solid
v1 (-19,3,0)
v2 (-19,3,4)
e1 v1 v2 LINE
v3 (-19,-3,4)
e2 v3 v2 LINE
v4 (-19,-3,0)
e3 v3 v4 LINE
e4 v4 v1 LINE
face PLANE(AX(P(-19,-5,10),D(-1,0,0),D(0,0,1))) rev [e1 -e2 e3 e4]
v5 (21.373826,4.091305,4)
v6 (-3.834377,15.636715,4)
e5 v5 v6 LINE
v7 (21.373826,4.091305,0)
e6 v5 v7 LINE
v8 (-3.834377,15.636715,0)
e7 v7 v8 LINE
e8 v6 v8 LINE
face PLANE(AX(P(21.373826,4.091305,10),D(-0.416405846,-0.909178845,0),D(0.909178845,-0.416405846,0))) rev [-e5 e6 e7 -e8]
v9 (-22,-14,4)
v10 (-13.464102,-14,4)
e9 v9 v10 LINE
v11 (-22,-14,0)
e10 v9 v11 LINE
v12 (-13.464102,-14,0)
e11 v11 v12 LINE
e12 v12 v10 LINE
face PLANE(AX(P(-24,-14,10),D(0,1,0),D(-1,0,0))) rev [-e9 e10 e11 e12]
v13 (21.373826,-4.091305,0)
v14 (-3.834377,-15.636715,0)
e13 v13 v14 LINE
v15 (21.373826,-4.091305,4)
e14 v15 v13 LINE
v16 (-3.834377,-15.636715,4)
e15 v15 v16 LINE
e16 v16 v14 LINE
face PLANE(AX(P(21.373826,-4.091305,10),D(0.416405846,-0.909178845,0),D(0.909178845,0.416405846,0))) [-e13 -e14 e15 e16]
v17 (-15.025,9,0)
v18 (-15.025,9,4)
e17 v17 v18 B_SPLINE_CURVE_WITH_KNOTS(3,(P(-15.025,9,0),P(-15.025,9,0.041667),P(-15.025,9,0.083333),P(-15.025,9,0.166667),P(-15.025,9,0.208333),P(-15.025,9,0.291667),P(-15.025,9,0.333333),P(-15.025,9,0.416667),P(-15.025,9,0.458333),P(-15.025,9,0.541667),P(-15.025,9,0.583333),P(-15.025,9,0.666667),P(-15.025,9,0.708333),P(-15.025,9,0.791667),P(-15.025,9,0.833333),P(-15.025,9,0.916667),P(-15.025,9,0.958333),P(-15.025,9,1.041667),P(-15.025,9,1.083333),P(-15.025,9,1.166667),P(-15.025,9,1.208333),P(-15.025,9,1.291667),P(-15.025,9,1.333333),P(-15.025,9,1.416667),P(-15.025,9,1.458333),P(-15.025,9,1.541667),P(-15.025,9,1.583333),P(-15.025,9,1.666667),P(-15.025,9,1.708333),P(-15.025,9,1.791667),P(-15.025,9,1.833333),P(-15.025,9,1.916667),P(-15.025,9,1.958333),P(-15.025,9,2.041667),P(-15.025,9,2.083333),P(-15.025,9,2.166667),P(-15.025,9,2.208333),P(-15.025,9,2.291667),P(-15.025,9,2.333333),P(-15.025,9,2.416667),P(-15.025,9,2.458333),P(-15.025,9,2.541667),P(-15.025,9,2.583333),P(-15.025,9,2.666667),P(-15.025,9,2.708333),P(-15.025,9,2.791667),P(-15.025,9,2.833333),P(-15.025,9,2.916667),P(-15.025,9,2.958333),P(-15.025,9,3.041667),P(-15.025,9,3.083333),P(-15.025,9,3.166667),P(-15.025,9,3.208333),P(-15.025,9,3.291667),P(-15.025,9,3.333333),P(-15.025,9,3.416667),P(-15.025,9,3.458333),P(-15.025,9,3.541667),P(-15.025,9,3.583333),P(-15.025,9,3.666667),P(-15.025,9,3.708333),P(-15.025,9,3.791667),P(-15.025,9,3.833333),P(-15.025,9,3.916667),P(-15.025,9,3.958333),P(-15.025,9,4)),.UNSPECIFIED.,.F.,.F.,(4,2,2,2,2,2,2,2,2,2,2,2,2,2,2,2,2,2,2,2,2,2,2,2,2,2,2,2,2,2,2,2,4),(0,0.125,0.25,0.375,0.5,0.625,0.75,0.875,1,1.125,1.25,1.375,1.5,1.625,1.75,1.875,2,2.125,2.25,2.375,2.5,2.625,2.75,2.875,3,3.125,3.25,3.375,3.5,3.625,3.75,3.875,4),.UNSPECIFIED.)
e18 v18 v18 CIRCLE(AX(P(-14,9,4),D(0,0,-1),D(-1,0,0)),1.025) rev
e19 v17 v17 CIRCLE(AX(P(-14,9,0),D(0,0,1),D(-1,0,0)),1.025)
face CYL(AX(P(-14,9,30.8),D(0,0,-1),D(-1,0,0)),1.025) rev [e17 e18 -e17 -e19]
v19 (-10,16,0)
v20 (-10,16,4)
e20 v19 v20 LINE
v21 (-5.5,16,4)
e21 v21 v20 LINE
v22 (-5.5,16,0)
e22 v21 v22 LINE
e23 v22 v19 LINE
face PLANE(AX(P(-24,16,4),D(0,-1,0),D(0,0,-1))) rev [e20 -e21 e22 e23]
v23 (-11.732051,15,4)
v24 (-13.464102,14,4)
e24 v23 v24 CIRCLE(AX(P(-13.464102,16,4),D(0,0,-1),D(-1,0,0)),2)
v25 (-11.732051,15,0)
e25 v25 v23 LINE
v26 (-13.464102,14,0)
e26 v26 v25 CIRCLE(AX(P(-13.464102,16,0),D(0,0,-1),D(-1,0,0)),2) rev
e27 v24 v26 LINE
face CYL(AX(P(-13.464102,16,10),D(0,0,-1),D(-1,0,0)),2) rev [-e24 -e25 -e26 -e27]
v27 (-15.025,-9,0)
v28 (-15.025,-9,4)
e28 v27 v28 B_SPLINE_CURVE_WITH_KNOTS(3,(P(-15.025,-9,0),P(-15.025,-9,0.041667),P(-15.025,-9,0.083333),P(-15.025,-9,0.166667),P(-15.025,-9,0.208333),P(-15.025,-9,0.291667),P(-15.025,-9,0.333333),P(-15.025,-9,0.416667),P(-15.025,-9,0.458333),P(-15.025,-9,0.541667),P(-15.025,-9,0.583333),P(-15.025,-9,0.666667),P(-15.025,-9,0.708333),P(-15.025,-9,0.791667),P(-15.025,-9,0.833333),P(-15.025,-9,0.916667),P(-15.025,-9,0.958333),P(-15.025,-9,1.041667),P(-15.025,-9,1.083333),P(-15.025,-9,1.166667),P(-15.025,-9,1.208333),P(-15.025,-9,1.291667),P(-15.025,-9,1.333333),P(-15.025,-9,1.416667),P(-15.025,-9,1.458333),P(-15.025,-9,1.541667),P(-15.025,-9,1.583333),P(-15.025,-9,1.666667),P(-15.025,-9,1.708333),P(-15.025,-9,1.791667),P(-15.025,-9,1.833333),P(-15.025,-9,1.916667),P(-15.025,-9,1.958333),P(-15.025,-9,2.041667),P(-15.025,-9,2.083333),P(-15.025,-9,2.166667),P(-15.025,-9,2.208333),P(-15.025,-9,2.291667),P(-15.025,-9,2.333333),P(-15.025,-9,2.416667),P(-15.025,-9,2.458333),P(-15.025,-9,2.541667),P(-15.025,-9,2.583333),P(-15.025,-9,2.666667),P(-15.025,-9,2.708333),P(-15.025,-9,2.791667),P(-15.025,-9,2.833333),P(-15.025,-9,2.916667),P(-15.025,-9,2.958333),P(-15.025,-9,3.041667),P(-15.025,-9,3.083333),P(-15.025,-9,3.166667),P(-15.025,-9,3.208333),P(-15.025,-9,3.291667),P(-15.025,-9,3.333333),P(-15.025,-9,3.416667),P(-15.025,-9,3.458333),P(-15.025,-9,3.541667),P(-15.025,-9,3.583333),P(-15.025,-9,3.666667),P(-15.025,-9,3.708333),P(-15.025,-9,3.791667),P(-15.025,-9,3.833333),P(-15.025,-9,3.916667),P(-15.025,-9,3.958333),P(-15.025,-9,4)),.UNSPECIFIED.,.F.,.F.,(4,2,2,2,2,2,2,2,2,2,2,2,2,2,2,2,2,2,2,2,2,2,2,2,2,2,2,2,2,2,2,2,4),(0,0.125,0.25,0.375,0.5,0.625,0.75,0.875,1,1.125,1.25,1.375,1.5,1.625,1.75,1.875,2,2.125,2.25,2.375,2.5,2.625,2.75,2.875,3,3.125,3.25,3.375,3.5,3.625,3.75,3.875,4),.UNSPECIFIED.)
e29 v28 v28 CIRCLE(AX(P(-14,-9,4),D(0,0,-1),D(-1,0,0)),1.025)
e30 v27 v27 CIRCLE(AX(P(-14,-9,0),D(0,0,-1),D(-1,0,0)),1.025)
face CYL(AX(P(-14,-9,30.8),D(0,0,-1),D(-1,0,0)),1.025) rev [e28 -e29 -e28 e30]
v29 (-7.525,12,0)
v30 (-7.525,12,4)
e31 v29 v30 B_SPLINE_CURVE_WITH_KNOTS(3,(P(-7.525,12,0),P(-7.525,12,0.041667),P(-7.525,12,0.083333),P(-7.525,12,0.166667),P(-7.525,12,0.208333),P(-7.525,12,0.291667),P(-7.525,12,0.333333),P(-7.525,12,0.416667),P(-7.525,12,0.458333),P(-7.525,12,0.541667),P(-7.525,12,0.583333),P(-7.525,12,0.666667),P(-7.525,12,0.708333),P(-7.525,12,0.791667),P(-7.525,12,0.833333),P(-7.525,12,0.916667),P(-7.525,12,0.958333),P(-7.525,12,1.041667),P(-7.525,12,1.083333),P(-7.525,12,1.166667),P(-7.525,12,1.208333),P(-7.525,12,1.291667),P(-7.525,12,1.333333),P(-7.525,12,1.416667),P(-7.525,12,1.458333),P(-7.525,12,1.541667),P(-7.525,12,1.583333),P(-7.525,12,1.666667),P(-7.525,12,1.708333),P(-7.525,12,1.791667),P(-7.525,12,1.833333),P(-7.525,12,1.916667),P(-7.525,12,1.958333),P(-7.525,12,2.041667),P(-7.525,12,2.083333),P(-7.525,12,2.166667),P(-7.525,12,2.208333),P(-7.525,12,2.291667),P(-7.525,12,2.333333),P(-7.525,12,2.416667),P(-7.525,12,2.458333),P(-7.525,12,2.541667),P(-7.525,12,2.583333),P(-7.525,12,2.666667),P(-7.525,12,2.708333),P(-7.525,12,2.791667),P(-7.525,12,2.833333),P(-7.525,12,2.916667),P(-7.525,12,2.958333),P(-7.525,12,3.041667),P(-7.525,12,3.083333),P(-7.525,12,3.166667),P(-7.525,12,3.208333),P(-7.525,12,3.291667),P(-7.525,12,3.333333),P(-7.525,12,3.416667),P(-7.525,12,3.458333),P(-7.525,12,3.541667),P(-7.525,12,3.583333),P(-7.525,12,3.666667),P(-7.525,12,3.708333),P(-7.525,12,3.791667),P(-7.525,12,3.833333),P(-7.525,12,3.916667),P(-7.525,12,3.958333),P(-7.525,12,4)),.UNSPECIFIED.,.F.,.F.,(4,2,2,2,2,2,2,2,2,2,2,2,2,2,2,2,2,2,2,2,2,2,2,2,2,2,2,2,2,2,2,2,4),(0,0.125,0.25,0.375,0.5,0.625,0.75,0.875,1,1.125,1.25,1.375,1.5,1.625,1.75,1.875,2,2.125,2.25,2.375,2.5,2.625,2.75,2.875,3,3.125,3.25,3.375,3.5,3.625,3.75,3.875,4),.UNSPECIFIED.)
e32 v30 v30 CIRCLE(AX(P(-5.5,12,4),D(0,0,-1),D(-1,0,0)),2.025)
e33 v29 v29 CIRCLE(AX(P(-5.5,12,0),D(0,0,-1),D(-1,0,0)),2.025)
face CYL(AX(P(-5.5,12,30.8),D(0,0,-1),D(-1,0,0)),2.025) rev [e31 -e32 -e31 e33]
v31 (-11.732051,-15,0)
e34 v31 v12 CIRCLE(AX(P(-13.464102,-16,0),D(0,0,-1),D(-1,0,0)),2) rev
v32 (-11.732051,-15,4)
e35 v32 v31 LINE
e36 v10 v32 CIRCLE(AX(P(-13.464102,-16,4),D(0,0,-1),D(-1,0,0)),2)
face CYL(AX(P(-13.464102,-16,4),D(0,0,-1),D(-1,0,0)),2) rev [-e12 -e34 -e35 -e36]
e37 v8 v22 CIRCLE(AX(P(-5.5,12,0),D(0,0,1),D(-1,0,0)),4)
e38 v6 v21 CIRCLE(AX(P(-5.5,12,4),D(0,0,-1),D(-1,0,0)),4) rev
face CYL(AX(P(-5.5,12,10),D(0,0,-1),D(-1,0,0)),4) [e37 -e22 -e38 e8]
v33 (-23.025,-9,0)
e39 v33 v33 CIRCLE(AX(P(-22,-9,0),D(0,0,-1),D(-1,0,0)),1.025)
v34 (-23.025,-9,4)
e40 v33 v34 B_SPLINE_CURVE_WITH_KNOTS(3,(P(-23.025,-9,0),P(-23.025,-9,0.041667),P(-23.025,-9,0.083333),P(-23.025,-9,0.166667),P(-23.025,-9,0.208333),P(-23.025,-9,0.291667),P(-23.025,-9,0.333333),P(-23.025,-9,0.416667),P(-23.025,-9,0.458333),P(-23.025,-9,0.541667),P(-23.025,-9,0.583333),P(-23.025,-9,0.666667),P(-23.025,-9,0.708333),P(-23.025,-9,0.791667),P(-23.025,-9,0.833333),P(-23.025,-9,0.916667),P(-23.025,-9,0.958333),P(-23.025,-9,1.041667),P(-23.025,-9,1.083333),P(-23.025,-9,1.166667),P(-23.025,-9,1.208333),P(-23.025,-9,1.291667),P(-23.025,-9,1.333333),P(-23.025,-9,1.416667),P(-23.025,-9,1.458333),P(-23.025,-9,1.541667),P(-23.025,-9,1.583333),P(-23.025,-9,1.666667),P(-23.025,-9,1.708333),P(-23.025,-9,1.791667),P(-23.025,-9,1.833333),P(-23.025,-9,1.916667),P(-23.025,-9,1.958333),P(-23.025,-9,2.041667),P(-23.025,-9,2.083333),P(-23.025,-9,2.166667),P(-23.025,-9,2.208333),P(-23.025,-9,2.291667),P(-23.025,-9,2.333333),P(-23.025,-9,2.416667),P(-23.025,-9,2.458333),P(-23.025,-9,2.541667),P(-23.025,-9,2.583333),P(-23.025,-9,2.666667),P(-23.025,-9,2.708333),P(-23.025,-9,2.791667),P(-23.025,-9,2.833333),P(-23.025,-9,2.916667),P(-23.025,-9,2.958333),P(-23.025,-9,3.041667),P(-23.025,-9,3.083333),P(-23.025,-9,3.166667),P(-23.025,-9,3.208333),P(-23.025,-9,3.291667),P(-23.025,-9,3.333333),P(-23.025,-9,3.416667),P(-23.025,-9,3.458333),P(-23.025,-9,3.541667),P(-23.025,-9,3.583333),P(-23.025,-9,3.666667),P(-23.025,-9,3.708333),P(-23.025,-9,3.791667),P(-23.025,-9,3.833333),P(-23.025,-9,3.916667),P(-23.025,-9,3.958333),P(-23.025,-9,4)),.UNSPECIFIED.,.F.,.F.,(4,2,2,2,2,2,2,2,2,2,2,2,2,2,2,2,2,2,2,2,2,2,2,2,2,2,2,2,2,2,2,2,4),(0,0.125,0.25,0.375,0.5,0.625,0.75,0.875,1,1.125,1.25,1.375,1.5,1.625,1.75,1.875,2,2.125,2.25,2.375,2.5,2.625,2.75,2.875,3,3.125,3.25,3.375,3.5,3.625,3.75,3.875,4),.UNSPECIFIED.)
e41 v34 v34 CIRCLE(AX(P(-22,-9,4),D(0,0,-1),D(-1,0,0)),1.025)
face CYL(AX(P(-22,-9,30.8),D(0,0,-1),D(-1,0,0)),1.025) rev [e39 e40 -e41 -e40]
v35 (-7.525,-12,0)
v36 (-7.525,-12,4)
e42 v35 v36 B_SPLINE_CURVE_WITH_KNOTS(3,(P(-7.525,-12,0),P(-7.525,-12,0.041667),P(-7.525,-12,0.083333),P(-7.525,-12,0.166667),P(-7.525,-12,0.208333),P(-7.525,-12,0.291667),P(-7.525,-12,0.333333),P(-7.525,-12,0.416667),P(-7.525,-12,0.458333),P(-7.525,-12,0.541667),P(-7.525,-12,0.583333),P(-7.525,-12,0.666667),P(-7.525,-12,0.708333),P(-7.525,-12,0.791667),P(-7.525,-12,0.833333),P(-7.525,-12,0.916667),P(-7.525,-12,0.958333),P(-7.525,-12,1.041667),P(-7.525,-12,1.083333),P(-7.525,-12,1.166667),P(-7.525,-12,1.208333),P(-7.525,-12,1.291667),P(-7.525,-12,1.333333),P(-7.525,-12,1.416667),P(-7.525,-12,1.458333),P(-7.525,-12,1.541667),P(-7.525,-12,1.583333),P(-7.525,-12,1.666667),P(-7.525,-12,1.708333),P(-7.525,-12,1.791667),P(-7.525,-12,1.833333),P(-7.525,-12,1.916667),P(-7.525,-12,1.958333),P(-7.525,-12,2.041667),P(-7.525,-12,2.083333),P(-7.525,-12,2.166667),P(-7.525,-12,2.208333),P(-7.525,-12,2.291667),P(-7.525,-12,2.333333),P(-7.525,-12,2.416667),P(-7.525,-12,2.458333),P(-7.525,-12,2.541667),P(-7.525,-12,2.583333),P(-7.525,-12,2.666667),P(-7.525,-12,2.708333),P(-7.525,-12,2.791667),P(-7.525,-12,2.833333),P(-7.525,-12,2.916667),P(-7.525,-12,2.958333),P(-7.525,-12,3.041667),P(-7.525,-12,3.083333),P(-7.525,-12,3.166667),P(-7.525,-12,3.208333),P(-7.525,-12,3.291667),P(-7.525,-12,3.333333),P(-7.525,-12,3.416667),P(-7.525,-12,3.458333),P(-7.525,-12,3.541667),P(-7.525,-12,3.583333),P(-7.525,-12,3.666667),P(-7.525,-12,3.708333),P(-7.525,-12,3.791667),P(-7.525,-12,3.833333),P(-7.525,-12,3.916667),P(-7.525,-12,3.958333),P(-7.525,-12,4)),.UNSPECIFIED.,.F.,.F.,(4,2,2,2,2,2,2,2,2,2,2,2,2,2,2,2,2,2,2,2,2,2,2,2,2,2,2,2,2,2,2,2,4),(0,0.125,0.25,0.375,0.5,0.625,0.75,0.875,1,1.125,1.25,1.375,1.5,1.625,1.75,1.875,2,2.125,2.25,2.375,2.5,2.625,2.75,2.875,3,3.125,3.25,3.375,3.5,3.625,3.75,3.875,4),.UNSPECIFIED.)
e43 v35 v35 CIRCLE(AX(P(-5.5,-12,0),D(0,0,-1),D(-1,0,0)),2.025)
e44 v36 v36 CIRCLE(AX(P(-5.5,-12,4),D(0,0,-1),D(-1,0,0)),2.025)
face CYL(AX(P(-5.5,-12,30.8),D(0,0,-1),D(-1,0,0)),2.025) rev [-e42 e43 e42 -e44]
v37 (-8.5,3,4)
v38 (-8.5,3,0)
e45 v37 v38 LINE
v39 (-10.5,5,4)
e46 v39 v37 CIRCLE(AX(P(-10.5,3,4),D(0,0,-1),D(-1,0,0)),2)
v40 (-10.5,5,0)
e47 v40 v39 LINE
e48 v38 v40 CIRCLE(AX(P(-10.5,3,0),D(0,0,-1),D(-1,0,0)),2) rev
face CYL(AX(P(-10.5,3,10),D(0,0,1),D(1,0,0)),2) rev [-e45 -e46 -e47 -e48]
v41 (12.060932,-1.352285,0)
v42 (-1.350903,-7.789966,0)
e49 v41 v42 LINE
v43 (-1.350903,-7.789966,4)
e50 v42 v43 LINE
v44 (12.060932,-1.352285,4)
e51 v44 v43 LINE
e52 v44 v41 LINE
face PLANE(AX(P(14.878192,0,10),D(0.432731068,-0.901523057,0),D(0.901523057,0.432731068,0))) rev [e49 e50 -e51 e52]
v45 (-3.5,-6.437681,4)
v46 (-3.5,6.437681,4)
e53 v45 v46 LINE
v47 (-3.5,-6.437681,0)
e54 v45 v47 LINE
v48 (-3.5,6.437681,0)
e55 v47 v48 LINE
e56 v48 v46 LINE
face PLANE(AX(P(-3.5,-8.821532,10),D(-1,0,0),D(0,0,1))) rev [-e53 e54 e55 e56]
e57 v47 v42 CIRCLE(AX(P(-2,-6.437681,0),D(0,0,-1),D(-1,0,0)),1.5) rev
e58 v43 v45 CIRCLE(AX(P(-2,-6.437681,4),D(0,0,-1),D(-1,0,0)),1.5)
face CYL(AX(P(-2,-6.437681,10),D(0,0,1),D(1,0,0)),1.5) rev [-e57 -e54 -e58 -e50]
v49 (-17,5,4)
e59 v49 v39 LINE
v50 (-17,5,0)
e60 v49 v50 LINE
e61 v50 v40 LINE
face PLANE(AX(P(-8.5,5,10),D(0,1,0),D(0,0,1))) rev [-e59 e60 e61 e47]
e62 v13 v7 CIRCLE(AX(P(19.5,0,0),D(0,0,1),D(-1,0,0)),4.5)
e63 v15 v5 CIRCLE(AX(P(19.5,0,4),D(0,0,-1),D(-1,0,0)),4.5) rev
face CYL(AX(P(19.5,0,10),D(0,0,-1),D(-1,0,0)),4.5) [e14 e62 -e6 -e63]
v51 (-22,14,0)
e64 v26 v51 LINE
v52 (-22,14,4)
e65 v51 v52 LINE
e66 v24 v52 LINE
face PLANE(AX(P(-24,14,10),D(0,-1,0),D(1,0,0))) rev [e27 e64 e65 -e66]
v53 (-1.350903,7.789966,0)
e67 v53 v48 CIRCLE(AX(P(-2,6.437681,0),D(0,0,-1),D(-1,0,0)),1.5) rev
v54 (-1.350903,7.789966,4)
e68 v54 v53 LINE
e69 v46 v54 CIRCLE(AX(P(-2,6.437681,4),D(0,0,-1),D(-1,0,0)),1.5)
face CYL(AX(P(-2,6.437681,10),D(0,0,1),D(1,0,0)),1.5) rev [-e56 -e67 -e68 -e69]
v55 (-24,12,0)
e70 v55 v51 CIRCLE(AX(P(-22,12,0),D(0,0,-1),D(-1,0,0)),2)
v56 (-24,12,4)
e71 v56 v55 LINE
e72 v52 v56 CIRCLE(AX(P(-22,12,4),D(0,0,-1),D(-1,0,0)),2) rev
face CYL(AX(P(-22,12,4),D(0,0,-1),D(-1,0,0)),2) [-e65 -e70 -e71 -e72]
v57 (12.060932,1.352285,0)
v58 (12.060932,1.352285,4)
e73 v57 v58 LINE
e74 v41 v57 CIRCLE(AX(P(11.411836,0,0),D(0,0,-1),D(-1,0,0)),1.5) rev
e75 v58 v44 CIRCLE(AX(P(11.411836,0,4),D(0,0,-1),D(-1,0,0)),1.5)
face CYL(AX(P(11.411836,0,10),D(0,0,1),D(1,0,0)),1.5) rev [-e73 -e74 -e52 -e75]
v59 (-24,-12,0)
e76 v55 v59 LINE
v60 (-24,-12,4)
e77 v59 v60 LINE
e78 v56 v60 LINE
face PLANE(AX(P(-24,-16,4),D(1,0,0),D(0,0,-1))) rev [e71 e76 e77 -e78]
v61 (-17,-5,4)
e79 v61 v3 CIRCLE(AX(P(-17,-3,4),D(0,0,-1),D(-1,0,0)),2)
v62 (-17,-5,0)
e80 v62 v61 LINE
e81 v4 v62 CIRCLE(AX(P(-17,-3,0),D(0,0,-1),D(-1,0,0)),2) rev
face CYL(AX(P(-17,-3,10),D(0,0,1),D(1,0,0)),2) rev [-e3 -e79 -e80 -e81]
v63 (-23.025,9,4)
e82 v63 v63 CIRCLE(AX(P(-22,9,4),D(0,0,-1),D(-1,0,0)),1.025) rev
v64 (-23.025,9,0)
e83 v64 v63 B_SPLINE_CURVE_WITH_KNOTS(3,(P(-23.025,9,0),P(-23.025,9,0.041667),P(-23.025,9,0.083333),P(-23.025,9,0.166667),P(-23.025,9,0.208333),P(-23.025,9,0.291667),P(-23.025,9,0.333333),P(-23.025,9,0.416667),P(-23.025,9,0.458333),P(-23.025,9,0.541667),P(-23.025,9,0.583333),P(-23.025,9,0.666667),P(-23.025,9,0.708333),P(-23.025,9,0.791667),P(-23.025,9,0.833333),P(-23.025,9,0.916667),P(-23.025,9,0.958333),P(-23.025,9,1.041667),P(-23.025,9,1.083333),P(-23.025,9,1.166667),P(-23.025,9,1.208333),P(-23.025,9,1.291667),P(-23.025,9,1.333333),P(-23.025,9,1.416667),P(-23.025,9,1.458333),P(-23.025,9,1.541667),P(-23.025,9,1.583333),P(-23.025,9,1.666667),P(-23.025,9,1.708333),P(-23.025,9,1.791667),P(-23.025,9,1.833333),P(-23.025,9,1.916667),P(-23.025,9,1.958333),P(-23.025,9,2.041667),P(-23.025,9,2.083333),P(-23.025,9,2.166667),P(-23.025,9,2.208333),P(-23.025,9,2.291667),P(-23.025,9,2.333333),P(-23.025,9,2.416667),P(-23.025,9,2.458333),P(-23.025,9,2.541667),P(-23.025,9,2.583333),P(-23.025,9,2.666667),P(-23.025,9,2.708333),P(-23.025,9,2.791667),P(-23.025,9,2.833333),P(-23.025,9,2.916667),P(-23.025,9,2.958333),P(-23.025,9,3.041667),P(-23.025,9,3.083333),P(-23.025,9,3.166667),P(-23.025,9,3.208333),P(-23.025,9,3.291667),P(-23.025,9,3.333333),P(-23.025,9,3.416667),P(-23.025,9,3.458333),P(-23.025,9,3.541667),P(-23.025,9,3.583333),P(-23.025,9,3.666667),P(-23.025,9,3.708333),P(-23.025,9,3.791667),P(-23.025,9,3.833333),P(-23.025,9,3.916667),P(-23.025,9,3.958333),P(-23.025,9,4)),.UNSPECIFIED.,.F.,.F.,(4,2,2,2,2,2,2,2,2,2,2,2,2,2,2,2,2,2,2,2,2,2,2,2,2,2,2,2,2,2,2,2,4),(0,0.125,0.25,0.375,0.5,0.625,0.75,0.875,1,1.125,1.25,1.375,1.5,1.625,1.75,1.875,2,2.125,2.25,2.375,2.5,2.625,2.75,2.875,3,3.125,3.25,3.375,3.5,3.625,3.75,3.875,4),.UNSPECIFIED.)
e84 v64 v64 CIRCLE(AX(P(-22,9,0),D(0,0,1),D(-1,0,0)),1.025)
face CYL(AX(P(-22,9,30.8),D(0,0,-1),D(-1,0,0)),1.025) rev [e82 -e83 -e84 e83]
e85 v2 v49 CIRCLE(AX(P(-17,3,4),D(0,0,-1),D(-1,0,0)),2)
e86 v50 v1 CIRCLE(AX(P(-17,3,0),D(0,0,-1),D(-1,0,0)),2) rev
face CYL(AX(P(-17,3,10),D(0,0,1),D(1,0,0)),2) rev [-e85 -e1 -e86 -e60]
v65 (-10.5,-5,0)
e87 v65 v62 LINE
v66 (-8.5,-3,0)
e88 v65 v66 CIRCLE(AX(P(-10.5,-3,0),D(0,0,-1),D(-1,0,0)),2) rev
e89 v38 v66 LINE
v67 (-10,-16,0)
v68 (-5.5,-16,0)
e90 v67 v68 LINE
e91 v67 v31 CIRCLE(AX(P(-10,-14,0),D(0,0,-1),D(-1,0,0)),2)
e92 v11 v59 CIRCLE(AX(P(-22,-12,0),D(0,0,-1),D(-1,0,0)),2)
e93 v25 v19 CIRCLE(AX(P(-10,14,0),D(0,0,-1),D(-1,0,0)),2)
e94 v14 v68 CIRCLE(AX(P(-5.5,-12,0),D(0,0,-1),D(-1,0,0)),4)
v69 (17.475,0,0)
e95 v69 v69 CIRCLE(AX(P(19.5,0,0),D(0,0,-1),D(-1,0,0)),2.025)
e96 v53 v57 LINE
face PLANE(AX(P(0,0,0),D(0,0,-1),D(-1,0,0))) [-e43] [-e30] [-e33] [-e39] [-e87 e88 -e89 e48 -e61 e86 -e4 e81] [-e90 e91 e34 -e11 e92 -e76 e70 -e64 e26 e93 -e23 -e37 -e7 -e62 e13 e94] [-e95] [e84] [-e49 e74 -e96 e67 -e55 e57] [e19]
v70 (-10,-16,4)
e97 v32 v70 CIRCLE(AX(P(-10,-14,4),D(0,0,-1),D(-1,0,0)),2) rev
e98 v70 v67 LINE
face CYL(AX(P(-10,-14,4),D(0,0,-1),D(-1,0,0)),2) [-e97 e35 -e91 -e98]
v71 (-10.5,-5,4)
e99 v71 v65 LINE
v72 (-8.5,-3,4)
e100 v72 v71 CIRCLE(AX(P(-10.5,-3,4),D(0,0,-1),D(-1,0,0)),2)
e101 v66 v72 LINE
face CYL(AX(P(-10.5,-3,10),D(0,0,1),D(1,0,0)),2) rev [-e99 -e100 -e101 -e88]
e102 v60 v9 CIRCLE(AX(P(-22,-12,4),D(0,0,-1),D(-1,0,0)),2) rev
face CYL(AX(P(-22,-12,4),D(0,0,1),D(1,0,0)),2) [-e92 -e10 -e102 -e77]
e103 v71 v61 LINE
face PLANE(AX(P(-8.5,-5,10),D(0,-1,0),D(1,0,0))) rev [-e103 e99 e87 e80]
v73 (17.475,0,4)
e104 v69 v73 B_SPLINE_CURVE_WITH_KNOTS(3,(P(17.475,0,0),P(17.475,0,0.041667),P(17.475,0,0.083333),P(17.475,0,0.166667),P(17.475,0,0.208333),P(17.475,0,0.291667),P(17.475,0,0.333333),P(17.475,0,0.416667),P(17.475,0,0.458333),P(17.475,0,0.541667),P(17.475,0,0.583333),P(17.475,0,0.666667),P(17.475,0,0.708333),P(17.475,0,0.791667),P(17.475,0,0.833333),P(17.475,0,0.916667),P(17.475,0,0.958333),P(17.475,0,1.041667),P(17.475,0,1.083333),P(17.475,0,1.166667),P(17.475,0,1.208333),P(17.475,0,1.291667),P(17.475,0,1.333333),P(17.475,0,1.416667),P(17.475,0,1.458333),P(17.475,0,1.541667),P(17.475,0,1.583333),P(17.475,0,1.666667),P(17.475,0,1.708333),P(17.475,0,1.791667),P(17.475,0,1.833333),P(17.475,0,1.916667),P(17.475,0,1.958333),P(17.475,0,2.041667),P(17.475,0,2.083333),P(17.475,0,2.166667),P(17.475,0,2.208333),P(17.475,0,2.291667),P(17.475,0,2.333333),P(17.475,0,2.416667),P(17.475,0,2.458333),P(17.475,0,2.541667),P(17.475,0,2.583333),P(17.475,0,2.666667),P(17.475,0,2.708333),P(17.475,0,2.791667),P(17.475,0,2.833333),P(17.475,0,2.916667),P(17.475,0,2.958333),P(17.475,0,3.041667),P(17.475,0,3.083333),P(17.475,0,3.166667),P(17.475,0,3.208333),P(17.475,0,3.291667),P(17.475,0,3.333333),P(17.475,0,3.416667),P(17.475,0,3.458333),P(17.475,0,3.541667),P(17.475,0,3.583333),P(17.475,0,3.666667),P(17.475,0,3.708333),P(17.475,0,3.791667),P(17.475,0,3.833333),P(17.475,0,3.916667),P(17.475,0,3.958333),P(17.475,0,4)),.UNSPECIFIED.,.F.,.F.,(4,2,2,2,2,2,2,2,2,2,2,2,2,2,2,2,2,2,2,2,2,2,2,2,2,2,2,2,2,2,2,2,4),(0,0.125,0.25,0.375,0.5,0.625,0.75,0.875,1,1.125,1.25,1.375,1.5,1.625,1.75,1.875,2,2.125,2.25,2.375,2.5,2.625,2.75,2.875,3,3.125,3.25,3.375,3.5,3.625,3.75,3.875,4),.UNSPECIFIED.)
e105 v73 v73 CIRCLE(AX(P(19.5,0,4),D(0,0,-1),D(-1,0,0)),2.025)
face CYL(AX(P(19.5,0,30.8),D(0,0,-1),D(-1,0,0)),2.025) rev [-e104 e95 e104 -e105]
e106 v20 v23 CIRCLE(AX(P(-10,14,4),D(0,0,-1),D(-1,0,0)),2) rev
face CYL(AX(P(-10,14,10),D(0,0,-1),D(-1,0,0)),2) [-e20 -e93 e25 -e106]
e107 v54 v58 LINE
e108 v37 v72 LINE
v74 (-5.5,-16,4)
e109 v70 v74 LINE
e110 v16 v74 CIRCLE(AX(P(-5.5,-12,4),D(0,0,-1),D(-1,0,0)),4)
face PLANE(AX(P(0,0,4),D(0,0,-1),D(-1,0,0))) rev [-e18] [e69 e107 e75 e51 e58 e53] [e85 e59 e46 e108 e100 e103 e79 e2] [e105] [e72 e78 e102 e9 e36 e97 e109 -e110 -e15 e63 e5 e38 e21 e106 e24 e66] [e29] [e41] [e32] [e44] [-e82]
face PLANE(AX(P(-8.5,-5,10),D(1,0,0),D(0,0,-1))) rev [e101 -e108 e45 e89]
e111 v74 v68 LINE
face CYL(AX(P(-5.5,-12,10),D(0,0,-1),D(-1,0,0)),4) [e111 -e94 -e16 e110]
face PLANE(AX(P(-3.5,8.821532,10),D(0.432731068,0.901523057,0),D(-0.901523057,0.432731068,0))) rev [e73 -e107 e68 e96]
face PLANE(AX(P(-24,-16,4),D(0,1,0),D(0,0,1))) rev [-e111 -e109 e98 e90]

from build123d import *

# Parameters (mm, degrees)
SKETCH_1_W          = 48
SKETCH_1_H          = 32
EXTRUDE_1_DEPTH     = 4
SKETCH_2_R          = 2.025
SKETCH_2_R_2        = 1.025
CUT_EXTRUDE_1_DEPTH = 30.8
CUT_EXTRUDE_2_DEPTH = 10
SKETCH_5_W          = 12
SKETCH_5_H          = 2
CUT_EXTRUDE_3_DEPTH = 10
FILLET_1_R          = 2
CUT_EXTRUDE_4_DEPTH = 10
FILLET_2_R          = 1.5
SKETCH_7_W          = 10.5
SKETCH_7_H          = 10
CUT_EXTRUDE_5_DEPTH = 10
FILLET_3_R          = 2


with BuildPart() as part:
    # 草图1 → 凸台-拉伸1 (new body)
    with BuildSketch(Plane.XY):
        Rectangle(SKETCH_1_W, SKETCH_1_H)
    extrude(amount=EXTRUDE_1_DEPTH)

    # 草图2 → 切除-拉伸1 (cut)
    with BuildSketch(Plane(origin=(0, 0, 0), x_dir=(-1, 0, 0), z_dir=(0, 0, -1))):
        with Locations((-19.5, 0)):
            Circle(SKETCH_2_R)
        with Locations((5.5, -12)):
            Circle(SKETCH_2_R)
        with Locations((5.5, 12)):
            Circle(SKETCH_2_R)
        with Locations((14, -9)):
            Circle(SKETCH_2_R_2)
        with Locations((22, -9)):
            Circle(SKETCH_2_R_2)
    cut_extrude_1 = extrude(amount=-CUT_EXTRUDE_1_DEPTH, mode=Mode.SUBTRACT)

    # 草图4 → 切除-拉伸2 (cut)
    with BuildSketch(Plane(origin=(0, 0, 0), x_dir=(-1, 0, 0), z_dir=(0, 0, -1))):
        with BuildLine():
            Line((-21.373826305, 4.091304802), (3.834376618, 15.636715379))
            ThreePointArc((3.834376618, 15.636715379), (4.647609689, 15.908123688), (5.5, 16))
            Line((5.5, 16), (-24, 16))
            Line((-24, 16), (-24, 0))
            ThreePointArc((-24, 0), (-23.286965696, 2.430821017), (-21.373826305, 4.091304802))
        make_face()
    cut_extrude_2 = extrude(amount=-CUT_EXTRUDE_2_DEPTH, mode=Mode.SUBTRACT)

    # 镜向1: 切除-拉伸2 across plane
    add(cut_extrude_2.mirror(Plane.ZX), mode=Mode.SUBTRACT)

    # 草图5 → 切除-拉伸3 (cut)
    with BuildSketch(Plane(origin=(0, 0, 0), x_dir=(-1, 0, 0), z_dir=(0, 0, -1))):
        with Locations((18, -15)):
            Rectangle(SKETCH_5_W, SKETCH_5_H)
        with Locations((18, 15)):
            Rectangle(SKETCH_5_W, SKETCH_5_H)
    extrude(amount=-CUT_EXTRUDE_3_DEPTH, mode=Mode.SUBTRACT)

    # 圆角1
    fillet_1_edges = [part.edges().sort_by_distance(p)[0] for p in [
        (-24, -14, 2),
        (-24, 14, 2),
        (-12, -16, 2),
        (-12, 16, 2),
    ]]
    fillet(fillet_1_edges, radius=FILLET_1_R - 0.0001)  # a hair under: the kernel refuses the full size

    # 草图6 → 切除-拉伸4 (cut)
    with BuildSketch(Plane(origin=(0, 0, 0), x_dir=(-1, 0, 0), z_dir=(0, 0, -1))):
        Polygon((3.5, 8.82153206), (-14.878191792, 0), (3.5, -8.82153206), align=None)
    extrude(amount=-CUT_EXTRUDE_4_DEPTH, mode=Mode.SUBTRACT)

    # 圆角2
    fillet_2_edges = [part.edges().sort_by_distance(p)[0] for p in [
        (-3.5, 8.82153206, 2),
        (-3.5, -8.82153206, 2),
        (14.878191792, 0, 2),
    ]]
    fillet(fillet_2_edges, radius=FILLET_2_R)

    # 镜向2: 切除-拉伸1 across plane
    add(cut_extrude_1.mirror(Plane.ZX), mode=Mode.SUBTRACT)

    # 草图7 → 切除-拉伸5 (cut)
    with BuildSketch(Plane(origin=(0, 0, 0), x_dir=(-1, 0, 0), z_dir=(0, 0, -1))):
        with Locations((13.75, 0)):
            Rectangle(SKETCH_7_W, SKETCH_7_H)
    extrude(amount=-CUT_EXTRUDE_5_DEPTH, mode=Mode.SUBTRACT)

    # 圆角3
    fillet_3_edges = [part.edges().sort_by_distance(p)[0] for p in [
        (-19, 5, 2),
        (-19, -5, 2),
        (-8.5, -5, 2),
        (-8.5, 5, 2),
        (-12, -14, 2),
        (-12, 14, 2),
    ]]
    fillet(fillet_3_edges, radius=FILLET_3_R)


solid = part.part
